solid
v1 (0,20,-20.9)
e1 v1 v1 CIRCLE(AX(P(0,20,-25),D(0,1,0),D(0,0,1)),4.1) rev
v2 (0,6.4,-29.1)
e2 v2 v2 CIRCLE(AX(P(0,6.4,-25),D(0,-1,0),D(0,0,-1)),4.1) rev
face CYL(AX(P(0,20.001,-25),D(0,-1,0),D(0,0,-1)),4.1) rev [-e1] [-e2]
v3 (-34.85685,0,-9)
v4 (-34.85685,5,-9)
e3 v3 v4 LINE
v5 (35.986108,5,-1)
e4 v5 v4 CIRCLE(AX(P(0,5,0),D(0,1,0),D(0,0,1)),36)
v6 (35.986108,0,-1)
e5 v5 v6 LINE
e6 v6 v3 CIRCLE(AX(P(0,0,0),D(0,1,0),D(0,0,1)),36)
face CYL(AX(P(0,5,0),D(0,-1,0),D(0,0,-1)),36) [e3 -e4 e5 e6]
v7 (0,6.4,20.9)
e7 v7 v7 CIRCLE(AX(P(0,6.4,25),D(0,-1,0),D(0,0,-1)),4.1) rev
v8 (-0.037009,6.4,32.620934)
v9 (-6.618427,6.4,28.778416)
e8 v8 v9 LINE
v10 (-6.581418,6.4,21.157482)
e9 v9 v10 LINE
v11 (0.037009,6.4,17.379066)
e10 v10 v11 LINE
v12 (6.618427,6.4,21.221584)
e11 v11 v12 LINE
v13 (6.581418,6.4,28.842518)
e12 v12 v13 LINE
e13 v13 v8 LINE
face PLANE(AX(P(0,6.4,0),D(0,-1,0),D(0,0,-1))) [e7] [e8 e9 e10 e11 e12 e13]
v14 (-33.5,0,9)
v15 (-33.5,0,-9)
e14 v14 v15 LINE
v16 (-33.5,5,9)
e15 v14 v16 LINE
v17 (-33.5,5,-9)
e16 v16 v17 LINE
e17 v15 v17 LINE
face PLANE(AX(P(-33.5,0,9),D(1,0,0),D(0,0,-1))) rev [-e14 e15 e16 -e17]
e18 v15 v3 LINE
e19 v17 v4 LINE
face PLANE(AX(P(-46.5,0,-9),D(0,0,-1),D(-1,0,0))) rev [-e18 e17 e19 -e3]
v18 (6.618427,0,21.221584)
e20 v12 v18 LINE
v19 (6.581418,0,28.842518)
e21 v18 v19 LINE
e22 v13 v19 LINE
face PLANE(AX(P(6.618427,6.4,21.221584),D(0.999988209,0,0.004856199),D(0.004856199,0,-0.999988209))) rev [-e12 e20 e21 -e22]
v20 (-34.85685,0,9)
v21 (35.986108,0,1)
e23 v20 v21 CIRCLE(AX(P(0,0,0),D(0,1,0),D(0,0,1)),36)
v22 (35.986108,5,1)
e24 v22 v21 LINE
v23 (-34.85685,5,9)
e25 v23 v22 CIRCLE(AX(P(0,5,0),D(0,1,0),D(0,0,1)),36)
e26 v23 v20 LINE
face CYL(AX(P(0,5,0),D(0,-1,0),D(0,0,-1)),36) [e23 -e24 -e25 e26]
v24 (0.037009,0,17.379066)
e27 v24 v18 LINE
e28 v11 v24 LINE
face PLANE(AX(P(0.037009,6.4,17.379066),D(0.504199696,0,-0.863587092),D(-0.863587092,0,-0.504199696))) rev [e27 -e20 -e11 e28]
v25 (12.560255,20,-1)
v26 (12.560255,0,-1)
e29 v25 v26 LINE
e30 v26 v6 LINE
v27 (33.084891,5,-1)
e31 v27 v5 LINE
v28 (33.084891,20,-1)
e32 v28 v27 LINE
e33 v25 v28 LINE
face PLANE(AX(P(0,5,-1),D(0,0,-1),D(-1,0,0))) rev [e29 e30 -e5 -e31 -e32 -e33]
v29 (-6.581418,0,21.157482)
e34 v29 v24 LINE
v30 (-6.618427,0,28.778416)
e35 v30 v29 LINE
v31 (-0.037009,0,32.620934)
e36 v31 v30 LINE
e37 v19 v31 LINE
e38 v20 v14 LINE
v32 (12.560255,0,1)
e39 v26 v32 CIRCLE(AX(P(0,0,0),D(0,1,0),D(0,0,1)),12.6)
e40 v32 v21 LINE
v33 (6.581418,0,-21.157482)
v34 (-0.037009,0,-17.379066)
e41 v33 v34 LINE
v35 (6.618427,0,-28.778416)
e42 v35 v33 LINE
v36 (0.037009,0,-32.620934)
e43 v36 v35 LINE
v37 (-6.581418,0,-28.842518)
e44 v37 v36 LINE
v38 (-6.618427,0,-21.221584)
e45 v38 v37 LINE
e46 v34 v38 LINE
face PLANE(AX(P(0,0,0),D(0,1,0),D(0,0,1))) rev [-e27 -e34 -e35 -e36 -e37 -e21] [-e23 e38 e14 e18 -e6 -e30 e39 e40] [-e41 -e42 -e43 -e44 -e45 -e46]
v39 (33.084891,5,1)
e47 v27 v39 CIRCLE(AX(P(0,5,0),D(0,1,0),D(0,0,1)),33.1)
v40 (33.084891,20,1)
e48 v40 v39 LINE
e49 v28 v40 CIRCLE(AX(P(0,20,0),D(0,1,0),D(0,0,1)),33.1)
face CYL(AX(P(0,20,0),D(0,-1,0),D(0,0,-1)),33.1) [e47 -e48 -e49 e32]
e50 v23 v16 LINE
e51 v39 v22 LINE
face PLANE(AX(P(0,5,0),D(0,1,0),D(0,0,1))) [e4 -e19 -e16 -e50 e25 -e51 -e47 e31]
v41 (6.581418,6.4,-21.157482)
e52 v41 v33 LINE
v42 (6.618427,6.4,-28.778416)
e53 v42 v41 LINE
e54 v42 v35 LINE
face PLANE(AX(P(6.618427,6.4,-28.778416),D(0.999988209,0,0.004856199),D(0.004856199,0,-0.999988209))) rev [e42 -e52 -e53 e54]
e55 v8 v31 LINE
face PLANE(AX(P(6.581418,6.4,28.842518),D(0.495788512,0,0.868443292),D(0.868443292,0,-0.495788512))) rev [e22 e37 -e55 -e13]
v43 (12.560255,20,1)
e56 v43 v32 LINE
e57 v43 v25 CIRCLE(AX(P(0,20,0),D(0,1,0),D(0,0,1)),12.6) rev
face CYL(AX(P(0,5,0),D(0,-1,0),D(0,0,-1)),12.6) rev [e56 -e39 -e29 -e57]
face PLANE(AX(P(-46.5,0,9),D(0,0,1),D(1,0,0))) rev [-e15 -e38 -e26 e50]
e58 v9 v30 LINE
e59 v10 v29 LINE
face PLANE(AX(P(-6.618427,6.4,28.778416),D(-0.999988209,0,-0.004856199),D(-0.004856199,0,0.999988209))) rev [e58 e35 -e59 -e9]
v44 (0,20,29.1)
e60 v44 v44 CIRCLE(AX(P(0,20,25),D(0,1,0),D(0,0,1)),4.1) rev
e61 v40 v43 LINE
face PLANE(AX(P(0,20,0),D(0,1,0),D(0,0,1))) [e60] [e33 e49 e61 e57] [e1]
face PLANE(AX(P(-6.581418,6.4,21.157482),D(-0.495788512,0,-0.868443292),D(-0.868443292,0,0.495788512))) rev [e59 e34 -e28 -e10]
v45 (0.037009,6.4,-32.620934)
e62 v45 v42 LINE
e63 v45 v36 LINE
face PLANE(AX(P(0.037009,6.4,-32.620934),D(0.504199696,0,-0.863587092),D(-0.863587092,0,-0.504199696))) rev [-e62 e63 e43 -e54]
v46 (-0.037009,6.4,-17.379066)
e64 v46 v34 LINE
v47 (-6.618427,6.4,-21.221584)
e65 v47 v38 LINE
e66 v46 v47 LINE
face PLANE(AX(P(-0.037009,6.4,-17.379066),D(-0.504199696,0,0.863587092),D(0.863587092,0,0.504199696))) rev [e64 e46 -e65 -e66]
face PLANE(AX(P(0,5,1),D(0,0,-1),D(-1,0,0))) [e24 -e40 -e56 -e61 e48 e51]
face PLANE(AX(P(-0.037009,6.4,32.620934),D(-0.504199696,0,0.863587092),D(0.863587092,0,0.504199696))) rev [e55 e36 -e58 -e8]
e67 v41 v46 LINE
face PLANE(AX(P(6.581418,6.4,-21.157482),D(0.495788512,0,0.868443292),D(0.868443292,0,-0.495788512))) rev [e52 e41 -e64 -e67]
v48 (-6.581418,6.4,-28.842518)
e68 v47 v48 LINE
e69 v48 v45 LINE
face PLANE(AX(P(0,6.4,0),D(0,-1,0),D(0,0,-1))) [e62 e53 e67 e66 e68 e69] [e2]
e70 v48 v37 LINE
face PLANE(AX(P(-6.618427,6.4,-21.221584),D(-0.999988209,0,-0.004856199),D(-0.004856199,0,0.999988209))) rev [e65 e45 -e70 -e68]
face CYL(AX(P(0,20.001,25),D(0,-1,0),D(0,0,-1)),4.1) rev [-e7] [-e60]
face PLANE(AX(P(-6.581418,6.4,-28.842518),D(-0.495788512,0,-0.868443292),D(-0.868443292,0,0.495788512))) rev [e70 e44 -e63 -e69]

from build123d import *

# Parameters (mm, degrees)
BOSS_EXTRUDE1_DEPTH = 5
BOSS_EXTRUDE2_DEPTH = 15
CUT_EXTRUDE1_REACH  = 56.699
SKETCH3_R           = 4.1
CUT_EXTRUDE2_DEPTH  = 6.4
SKETCH9_W           = 13
SKETCH9_H           = 18
CUT_EXTRUDE3_DEPTH  = 55.699177325


# Read off the part's stored shape, not the designer's step: Boss-Extrude2
with BuildPart() as part:
    # Sketch1 → Boss-Extrude1 (new body)
    with BuildSketch(Plane(origin=(0, 0, 0), x_dir=(1, 0, 0), z_dir=(0, 1, 0))):
        with BuildLine():
            Line((35.986108431, -1), (12.560254774, -1))
            ThreePointArc((12.560254774, -1), (-12.6, 0), (12.560254774, 1))
            Line((12.560254774, 1), (35.986108431, 1))
            ThreePointArc((35.986108431, 1), (-36, 0), (35.986108431, -1))
        make_face()
    extrude(amount=BOSS_EXTRUDE1_DEPTH)

    # Boss-Extrude2 outline → Boss-Extrude2 (add)
    with BuildSketch(Plane(origin=(0, 5, 0), x_dir=(1, 0, 0), z_dir=(0, 1, 0))):
        with BuildLine():
            Line((33.084890811, -1), (12.560254774, -1))
            ThreePointArc((12.560254774, -1), (-12.6, 0), (12.560254774, 1))
            Line((12.560254774, 1), (33.084890811, 1))
            ThreePointArc((33.084890811, 1), (-33.1, 0), (33.084890811, -1))
        make_face()
    extrude(amount=BOSS_EXTRUDE2_DEPTH)

    # Sketch3 → Cut-Extrude1 (cut, up to next)
    with BuildSketch(Plane.XZ, mode=Mode.PRIVATE) as cut_extrude1_sk1:
        with Locations(Location((0, 25, 0), (0, 0, 270))):
            Circle(SKETCH3_R)
    cut_extrude1_tool1 = extrude(cut_extrude1_sk1.sketch, amount=-CUT_EXTRUDE1_REACH, mode=Mode.PRIVATE) & part.part
    # Sketch3 → Cut-Extrude1 (cut, up to next)
    with BuildSketch(Plane.XZ, mode=Mode.PRIVATE) as cut_extrude1_sk2:
        with Locations(Location((0, -25, 0), (0, 0, 270))):
            Circle(SKETCH3_R)
    cut_extrude1_tool2 = extrude(cut_extrude1_sk2.sketch, amount=-CUT_EXTRUDE1_REACH, mode=Mode.PRIVATE) & part.part
    add(cut_extrude1_tool1.solids().sort_by_distance((0, 0, 25))[0], mode=Mode.SUBTRACT)
    add(cut_extrude1_tool2.solids().sort_by_distance((0, 0, -25))[0], mode=Mode.SUBTRACT)

    # Sketch8 → Cut-Extrude2 (cut)
    with BuildSketch(Plane.XZ):
        Polygon((6.618426782, 21.22158407), (6.581417572, 28.842517761), (-0.03700921, 32.620933691), (-6.618426782, 28.77841593), (-6.581417572, 21.157482239), (0.03700921, 17.379066309), align=None)
        Polygon((6.618426782, -28.77841593), (6.581417572, -21.157482239), (-0.03700921, -17.379066309), (-6.618426782, -21.22158407), (-6.581417572, -28.842517761), (0.03700921, -32.620933691), align=None)
    extrude(amount=-CUT_EXTRUDE2_DEPTH, mode=Mode.SUBTRACT)

    # Sketch9 → Cut-Extrude3 (cut, through all)
    with BuildSketch(Plane(origin=(0, 20, 0), x_dir=(1, 0, 0), z_dir=(0, 1, 0))):
        with Locations((-40, 0)):
            Rectangle(SKETCH9_W, SKETCH9_H)
    extrude(amount=-CUT_EXTRUDE3_DEPTH, mode=Mode.SUBTRACT)


solid = part.part
